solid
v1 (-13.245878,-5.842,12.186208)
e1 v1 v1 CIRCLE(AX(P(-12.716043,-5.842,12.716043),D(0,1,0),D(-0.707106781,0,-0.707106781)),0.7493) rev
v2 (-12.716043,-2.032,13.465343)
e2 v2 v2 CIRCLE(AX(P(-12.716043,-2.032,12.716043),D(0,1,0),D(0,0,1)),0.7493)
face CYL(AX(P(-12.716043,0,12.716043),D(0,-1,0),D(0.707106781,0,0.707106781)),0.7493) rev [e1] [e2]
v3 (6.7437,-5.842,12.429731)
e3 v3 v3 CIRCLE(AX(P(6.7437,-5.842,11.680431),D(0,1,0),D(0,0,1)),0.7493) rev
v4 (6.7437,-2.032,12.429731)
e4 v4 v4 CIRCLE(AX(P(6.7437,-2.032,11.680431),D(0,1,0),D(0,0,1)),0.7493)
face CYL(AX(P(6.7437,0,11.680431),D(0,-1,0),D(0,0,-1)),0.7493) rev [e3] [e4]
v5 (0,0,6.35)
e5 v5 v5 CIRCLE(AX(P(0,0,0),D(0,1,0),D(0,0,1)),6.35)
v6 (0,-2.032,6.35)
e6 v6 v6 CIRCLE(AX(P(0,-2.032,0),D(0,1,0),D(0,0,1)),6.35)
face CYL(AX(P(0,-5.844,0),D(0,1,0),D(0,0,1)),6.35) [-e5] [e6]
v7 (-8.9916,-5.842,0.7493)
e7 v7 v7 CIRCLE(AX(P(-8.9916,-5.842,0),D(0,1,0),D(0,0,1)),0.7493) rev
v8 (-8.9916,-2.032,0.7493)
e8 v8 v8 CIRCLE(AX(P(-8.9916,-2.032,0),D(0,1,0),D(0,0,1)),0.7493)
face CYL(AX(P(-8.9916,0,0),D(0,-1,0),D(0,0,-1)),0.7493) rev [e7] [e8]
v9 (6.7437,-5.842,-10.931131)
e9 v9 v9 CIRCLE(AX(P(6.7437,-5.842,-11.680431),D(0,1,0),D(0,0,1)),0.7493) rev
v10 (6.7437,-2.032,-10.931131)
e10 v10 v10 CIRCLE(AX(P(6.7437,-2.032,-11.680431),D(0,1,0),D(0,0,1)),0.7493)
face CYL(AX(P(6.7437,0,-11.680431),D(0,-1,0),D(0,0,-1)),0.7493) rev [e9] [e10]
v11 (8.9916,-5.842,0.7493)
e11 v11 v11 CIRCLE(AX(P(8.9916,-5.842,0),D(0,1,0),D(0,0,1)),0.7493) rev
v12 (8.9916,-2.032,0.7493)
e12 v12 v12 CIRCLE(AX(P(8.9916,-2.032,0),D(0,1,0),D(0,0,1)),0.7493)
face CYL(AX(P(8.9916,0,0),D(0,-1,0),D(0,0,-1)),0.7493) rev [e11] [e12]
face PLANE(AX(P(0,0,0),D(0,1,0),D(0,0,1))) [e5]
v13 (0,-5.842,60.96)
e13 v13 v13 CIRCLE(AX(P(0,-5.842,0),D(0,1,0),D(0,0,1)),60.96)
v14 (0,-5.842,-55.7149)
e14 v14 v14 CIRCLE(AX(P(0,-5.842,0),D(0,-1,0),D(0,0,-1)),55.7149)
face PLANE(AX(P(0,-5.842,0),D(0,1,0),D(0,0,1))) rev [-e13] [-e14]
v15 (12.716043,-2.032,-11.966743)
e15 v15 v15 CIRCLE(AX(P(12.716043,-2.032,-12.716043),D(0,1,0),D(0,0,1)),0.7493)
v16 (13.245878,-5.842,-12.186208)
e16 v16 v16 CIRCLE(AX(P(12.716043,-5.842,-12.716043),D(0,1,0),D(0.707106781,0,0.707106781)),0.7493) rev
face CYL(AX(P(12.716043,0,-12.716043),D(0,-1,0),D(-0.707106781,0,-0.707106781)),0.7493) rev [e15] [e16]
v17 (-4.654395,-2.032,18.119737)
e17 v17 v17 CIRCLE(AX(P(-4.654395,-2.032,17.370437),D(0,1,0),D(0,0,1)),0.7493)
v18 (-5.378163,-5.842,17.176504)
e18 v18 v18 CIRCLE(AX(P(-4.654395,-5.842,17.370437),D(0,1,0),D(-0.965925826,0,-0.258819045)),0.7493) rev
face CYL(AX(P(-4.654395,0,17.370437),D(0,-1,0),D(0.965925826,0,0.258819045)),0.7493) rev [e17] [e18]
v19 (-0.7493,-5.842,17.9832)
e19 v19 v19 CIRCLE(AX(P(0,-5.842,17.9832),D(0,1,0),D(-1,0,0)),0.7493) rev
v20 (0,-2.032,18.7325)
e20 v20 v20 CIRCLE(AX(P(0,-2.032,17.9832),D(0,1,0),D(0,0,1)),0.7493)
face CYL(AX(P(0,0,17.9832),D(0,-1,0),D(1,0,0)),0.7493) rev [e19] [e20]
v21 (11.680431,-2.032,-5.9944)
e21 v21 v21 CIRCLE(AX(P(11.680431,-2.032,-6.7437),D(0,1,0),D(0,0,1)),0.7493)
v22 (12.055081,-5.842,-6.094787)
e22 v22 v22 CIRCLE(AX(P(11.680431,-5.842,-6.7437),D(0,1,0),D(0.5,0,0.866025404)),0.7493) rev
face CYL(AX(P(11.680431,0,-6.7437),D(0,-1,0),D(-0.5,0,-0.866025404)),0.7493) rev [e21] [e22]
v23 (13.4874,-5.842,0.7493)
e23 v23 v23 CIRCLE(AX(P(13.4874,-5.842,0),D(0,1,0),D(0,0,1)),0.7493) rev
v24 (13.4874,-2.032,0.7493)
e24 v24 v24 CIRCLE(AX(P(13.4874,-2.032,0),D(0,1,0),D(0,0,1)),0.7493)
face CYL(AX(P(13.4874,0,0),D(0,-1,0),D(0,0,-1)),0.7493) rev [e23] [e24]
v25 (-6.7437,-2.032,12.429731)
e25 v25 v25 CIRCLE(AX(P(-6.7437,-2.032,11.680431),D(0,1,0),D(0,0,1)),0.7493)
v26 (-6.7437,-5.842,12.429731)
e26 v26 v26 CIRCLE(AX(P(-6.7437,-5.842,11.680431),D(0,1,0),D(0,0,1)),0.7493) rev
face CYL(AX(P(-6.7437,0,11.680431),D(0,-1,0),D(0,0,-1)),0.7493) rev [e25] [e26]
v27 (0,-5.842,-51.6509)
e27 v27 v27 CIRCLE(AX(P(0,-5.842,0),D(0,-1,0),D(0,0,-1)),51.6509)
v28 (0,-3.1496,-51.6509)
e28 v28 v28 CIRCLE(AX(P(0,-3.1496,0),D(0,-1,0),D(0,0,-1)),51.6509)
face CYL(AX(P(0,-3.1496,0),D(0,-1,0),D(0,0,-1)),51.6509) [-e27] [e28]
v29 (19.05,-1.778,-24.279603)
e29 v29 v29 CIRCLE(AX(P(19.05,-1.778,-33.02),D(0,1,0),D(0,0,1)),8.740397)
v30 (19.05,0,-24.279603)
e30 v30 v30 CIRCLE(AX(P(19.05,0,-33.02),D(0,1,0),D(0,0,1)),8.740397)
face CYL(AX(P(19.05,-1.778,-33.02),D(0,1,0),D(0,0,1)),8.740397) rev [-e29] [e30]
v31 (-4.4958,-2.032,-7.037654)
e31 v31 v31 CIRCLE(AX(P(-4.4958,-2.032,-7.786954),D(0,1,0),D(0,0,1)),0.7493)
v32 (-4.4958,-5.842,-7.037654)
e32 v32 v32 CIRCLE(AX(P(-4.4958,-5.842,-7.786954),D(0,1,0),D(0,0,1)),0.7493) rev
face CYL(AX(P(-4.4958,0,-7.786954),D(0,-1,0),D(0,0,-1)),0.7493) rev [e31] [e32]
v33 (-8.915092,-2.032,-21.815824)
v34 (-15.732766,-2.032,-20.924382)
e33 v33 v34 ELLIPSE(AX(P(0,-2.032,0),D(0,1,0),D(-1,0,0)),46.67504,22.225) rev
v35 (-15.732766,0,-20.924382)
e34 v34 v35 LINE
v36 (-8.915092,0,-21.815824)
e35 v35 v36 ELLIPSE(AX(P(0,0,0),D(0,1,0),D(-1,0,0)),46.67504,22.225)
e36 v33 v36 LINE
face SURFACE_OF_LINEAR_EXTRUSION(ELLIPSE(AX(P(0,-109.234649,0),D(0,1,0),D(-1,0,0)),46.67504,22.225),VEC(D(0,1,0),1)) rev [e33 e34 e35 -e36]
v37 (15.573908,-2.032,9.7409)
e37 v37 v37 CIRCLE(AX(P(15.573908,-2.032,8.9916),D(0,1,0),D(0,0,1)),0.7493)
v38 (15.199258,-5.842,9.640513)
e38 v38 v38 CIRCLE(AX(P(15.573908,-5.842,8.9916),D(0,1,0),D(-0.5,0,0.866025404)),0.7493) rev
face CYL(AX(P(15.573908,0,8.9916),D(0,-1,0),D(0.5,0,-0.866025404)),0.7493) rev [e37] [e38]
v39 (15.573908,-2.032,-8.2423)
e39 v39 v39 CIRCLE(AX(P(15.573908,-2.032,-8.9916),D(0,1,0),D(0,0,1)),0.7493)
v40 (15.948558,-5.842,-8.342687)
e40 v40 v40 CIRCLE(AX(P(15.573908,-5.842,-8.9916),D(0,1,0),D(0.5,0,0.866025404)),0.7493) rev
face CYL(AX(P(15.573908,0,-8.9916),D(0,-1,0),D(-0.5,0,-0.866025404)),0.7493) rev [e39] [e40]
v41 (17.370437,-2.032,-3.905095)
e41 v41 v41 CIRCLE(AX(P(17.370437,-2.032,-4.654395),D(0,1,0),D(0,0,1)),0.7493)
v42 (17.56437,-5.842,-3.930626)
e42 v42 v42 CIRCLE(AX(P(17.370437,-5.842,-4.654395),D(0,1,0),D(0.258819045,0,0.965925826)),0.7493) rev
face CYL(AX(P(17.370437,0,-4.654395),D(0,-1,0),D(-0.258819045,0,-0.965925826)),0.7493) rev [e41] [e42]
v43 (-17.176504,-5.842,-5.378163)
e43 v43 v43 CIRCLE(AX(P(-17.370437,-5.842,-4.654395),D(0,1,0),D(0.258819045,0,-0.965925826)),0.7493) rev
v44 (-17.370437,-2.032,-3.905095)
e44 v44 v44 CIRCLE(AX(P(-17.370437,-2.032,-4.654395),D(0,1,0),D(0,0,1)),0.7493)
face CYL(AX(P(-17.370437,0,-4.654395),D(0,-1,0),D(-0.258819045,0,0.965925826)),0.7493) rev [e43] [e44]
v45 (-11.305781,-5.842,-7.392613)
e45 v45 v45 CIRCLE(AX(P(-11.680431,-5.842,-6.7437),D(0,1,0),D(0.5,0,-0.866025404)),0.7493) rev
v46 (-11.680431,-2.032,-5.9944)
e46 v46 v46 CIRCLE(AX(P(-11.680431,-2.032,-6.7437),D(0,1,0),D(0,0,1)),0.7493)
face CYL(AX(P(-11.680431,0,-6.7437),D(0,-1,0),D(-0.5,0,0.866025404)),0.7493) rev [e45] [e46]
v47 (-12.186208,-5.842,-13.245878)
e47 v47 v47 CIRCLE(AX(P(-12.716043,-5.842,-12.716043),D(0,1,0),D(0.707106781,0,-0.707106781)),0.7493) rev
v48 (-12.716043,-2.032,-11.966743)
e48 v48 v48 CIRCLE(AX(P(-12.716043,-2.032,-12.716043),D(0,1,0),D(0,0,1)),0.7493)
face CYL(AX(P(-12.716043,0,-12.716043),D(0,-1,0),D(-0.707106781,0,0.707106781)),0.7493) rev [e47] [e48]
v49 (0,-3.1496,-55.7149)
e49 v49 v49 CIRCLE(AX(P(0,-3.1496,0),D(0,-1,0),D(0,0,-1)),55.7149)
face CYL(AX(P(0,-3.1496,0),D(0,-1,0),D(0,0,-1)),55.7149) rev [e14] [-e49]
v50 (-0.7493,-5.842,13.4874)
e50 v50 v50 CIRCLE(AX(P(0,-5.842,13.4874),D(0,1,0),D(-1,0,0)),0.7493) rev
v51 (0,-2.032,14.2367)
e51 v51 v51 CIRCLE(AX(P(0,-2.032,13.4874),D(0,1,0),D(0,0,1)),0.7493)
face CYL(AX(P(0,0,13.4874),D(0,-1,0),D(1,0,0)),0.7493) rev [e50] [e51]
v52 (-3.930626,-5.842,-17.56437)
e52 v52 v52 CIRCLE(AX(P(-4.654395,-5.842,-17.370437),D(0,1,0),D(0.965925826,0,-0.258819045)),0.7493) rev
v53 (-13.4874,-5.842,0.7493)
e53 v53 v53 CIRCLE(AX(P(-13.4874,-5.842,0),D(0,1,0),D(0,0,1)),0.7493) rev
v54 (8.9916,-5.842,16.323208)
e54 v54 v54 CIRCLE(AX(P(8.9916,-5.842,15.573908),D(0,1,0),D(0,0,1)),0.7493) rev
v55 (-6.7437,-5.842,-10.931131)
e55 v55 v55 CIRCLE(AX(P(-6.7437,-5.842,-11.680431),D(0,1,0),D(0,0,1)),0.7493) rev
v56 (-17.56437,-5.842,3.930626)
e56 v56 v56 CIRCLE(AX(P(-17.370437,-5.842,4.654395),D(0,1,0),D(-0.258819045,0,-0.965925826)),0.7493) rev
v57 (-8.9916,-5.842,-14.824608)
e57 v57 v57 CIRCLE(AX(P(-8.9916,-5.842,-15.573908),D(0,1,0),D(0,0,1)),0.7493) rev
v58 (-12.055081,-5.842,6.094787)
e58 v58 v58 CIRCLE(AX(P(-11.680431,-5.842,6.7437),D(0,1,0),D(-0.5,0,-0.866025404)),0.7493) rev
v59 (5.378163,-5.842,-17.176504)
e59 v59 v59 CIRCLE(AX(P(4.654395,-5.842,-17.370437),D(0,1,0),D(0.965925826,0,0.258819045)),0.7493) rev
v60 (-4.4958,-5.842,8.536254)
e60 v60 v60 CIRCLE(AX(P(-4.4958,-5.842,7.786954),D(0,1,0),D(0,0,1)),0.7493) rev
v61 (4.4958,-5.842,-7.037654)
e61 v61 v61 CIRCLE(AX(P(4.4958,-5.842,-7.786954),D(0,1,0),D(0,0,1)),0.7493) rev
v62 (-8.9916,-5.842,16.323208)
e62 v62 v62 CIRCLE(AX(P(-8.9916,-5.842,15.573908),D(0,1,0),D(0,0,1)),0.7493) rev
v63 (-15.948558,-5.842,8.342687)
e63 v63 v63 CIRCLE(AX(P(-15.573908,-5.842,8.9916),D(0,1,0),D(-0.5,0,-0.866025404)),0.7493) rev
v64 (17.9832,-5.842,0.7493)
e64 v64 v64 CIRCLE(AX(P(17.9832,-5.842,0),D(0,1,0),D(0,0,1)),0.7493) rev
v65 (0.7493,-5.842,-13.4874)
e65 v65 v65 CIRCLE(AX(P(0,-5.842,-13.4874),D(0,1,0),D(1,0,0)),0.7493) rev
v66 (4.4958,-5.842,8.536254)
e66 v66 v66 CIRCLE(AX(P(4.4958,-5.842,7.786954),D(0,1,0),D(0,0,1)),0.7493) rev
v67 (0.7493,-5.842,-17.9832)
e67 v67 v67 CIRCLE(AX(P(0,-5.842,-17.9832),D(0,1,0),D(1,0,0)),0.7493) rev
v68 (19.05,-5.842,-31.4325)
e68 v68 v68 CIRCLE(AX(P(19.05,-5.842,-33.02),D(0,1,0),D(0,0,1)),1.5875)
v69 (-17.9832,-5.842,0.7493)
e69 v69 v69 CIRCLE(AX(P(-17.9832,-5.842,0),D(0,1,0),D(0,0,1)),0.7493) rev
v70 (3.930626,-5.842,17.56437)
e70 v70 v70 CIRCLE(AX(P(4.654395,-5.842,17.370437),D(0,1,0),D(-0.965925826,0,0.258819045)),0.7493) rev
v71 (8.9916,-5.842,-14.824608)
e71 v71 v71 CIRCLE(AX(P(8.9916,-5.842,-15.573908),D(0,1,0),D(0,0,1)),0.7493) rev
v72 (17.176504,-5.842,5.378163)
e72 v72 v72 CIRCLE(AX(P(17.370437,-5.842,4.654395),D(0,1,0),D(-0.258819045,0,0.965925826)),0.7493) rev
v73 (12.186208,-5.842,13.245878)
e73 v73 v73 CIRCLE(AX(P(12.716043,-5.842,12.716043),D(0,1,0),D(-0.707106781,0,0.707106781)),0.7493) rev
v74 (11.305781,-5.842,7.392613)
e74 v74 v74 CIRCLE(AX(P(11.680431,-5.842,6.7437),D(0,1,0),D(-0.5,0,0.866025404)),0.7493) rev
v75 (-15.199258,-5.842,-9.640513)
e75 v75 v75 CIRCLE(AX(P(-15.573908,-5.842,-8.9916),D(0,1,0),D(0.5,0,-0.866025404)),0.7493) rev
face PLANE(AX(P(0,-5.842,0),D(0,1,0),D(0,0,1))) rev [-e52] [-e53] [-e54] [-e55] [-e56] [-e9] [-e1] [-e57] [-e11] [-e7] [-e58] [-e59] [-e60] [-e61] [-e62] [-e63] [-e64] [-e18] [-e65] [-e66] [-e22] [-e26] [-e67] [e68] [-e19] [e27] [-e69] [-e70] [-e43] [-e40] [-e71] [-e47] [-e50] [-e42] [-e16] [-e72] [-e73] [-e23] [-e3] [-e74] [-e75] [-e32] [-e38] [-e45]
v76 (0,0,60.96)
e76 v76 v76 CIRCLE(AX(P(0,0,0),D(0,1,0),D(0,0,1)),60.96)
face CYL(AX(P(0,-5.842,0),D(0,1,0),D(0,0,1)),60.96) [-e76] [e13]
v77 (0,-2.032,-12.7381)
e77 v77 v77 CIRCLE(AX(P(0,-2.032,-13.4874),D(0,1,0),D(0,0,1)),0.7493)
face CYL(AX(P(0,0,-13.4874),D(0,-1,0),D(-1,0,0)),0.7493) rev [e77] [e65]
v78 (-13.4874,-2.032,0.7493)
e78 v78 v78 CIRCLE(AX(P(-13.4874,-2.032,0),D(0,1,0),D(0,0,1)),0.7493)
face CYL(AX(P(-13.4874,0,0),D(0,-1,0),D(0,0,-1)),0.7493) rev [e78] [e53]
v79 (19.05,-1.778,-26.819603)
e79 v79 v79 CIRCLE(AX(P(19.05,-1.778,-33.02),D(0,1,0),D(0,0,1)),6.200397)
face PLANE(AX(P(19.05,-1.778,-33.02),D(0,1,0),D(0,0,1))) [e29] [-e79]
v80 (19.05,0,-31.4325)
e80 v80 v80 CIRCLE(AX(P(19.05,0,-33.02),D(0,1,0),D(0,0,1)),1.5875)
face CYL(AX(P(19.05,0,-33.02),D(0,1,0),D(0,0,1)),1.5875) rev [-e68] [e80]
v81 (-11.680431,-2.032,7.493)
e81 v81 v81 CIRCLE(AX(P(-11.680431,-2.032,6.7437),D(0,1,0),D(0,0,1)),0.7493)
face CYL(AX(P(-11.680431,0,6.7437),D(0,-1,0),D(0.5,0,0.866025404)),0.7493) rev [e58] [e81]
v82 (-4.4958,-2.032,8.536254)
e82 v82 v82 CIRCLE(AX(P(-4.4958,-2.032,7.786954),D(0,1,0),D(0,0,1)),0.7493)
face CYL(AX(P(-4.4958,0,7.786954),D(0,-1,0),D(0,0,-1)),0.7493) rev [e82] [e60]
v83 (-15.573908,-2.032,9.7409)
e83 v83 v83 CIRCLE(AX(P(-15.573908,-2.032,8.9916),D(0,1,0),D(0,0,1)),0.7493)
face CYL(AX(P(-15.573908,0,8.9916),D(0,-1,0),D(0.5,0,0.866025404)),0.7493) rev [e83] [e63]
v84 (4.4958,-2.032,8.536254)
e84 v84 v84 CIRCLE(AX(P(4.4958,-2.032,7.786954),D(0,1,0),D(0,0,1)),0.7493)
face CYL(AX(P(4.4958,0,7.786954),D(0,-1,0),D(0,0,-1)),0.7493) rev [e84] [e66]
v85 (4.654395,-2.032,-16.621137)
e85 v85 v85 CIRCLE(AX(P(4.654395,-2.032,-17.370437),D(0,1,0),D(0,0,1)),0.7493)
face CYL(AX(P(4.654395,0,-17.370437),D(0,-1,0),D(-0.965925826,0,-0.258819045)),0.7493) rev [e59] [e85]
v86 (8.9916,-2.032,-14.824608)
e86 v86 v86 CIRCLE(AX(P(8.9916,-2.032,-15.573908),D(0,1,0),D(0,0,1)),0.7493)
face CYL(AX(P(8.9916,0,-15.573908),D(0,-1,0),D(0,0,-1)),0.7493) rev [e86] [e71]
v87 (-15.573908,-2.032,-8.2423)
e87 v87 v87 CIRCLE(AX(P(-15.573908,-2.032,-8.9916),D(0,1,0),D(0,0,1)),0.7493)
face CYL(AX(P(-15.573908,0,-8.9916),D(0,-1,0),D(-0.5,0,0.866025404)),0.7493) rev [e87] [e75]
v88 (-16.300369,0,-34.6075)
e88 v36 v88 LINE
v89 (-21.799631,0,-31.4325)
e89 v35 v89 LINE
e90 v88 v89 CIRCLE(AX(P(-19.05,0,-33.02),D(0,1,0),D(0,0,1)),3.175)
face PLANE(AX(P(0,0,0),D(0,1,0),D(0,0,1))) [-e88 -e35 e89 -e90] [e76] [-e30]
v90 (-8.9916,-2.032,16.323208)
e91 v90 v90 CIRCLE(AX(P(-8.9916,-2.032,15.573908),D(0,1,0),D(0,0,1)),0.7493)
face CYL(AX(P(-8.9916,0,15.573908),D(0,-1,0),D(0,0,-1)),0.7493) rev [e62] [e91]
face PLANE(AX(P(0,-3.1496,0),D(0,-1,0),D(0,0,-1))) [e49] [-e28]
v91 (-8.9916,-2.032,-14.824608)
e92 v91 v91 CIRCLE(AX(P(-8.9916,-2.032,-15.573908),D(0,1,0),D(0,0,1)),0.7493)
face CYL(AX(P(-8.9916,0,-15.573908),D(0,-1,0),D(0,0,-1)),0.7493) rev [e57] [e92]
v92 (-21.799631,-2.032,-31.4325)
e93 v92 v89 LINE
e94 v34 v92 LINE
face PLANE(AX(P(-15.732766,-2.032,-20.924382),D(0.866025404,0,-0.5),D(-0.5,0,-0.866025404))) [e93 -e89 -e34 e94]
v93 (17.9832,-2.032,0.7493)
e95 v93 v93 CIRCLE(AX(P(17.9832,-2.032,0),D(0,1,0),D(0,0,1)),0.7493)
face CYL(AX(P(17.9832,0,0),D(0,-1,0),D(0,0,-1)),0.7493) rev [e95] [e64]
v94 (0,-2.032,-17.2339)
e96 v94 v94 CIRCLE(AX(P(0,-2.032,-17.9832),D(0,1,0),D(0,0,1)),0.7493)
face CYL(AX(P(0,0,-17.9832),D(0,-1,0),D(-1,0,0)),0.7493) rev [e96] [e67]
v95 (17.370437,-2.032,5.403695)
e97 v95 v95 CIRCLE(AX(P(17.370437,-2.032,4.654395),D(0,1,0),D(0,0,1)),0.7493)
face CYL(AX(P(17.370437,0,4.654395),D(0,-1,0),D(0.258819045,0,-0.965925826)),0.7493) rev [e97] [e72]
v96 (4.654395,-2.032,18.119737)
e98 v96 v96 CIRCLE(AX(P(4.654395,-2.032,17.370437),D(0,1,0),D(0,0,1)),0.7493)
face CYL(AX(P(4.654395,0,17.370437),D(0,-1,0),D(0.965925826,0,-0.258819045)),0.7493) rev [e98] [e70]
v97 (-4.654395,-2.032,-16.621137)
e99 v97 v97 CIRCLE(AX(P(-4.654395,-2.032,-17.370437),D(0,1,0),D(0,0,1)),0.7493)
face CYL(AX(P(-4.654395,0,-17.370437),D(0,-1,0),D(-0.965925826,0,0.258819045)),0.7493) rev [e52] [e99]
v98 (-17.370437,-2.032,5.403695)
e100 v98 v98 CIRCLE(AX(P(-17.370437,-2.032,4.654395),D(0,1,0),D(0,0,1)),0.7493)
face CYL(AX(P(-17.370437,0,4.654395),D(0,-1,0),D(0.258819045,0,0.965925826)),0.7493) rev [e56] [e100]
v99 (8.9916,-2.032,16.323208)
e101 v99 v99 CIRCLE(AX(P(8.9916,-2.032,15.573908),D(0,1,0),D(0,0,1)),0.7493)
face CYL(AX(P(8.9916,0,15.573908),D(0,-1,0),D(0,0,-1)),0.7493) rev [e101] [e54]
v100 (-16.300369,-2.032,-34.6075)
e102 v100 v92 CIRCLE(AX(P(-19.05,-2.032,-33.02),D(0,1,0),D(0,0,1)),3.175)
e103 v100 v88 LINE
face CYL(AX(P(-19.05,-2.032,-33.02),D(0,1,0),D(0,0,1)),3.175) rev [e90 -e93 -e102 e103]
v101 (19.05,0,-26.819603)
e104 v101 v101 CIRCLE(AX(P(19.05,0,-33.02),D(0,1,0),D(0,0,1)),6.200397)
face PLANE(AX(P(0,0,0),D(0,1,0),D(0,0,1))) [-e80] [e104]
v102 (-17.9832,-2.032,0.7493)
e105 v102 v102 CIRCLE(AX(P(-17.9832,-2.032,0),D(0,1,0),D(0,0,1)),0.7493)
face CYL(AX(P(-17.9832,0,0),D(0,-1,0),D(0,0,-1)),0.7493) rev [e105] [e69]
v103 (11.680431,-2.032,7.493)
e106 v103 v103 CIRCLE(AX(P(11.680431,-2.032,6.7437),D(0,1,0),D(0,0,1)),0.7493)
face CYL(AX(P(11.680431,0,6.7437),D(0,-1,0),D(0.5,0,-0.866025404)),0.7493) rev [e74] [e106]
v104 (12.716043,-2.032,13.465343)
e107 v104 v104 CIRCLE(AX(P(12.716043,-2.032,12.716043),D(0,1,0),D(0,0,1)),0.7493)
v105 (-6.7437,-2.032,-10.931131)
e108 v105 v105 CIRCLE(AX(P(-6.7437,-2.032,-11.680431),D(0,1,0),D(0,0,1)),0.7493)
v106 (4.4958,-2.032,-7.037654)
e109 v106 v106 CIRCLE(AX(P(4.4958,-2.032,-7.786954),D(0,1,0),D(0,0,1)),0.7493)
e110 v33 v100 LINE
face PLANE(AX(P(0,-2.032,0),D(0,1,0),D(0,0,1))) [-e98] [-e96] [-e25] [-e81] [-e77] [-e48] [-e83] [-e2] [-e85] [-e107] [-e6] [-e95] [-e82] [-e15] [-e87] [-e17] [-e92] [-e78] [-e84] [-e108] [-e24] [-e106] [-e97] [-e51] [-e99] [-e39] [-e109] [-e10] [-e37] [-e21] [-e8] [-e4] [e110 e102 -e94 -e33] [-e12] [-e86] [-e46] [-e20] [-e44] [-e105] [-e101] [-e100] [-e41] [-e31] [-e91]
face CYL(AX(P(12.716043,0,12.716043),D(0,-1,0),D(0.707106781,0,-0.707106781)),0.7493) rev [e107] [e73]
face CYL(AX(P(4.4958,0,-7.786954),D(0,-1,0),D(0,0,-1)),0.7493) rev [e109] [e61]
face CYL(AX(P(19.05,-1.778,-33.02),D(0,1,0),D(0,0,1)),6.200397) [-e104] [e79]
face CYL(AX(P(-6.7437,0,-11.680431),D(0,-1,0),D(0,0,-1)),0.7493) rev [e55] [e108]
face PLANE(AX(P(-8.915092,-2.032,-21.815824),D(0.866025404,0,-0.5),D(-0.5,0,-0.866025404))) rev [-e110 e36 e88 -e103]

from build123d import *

# Parameters (mm, degrees)
SKETCH1_R                       = 60.96
BILLET_DEPTH                    = 5.842
SKETCH4_R                       = 0.7493
FIRST_KEROSENE_OUTLET_DEPTH     = 88.140881336
PRIMARY_HOLES_COUNT             = 6
SECOND_START                    = -5.842
SECOND_RING_OUTLINE_R           = 0.7493
SECOND_RING_DEPTH               = 5.842
THIRD_START                     = -5.842
THIRD_RING_OUTLINE_R            = 0.7493
THIRD_RING_DEPTH                = 5.842
SKETCH18_RX                     = 46.67504
SKETCH18_RY                     = 22.225
KEROSENE_WELL_DEPTH             = 2.032
SKETCH17_R                      = 6.35
BOSS_EXTRUDE1_DEPTH             = 2.54
BOSS_EXTRUDE1_DIRECTION_2_REACH = 88.408
SKETCH21_R                      = 6.35
CUT_EXTRUDE1_DEPTH              = 2.54
CUT_EXTRUDE2_DEPTH              = 2.032
F_1_8_0_125_DIAMETER_HOLE2_D    = 3.175
SKETCH31_R                      = 8.740396603
SKETCH31_R_2                    = 6.200396603
CUT_EXTRUDE4_DEPTH              = 1.778
SKETCH32_R                      = 55.7149
SKETCH32_R_2                    = 51.6509
CUT_EXTRUDE5_DEPTH              = 2.6924


# Read off the part's stored shape, not the designer's step: Second ring, Third Ring
with BuildPart() as part:
    # Sketch1 → Billet (new body)
    with BuildSketch(Plane(origin=(0, 0, 0), x_dir=(1, 0, 0), z_dir=(0, 1, 0))):
        with Locations(Location((0, 0, 0), (0, 0, 270))):
            Circle(SKETCH1_R)
    extrude(amount=-BILLET_DEPTH)

    # Sketch4 → First Kerosene Outlet (cut, symmetric)
    with BuildSketch(Plane(origin=(0, -12.7, 0), x_dir=(1, 0, 0), z_dir=(0, 1, 0))):
        with Locations(Location((8.9916, 0, 0), (0, 0, 270))):
            Circle(SKETCH4_R)
        with Locations(Location((13.4874, 0, 0), (0, 0, 270))):
            Circle(SKETCH4_R)
        with Locations(Location((17.9832, 0, 0), (0, 0, 270))):
            Circle(SKETCH4_R)
    first_kerosene_outlet = extrude(amount=FIRST_KEROSENE_OUTLET_DEPTH, both=True, mode=Mode.SUBTRACT)

    # Primary Holes: First Kerosene Outlet ×6 about axis
    primary_holes_axis = Axis((0, 0, 0), (0, 1, 0))
    for i in range(1, PRIMARY_HOLES_COUNT):
        add(first_kerosene_outlet.rotate(primary_holes_axis, i * 360 / PRIMARY_HOLES_COUNT), mode=Mode.SUBTRACT)

    # Second ring outline → Second ring (cut)
    with BuildSketch(Plane(origin=(0, 0, 0), x_dir=(1, 0, 0), z_dir=(0, 1, 0)).offset(SECOND_START)):
        with Locations((11.680431031, 6.7437)):
            Circle(SECOND_RING_OUTLINE_R)
        with Locations((0, 13.4874)):
            Circle(SECOND_RING_OUTLINE_R)
        with Locations((-11.680431031, 6.7437)):
            Circle(SECOND_RING_OUTLINE_R)
        with Locations((-11.680431031, -6.7437)):
            Circle(SECOND_RING_OUTLINE_R)
        with Locations((0, -13.4874)):
            Circle(SECOND_RING_OUTLINE_R)
        with Locations((11.680431031, -6.7437)):
            Circle(SECOND_RING_OUTLINE_R)
    extrude(amount=SECOND_RING_DEPTH, mode=Mode.SUBTRACT)

    # Third Ring outline → Third Ring (cut)
    with BuildSketch(Plane(origin=(0, 0, 0), x_dir=(1, 0, 0), z_dir=(0, 1, 0)).offset(THIRD_START)):
        with Locations((17.370437319, 4.654394652)):
            Circle(THIRD_RING_OUTLINE_R)
        with Locations((15.573908041, 8.9916)):
            Circle(THIRD_RING_OUTLINE_R)
        with Locations((12.716042667, 12.716042667)):
            Circle(THIRD_RING_OUTLINE_R)
        with Locations((4.654394652, 17.370437319)):
            Circle(THIRD_RING_OUTLINE_R)
        with Locations((0, 17.9832)):
            Circle(THIRD_RING_OUTLINE_R)
        with Locations((-4.654394652, 17.370437319)):
            Circle(THIRD_RING_OUTLINE_R)
        with Locations((-12.716042667, 12.716042667)):
            Circle(THIRD_RING_OUTLINE_R)
        with Locations((-15.573908041, 8.9916)):
            Circle(THIRD_RING_OUTLINE_R)
        with Locations((-17.370437319, 4.654394652)):
            Circle(THIRD_RING_OUTLINE_R)
        with Locations((-17.370437319, -4.654394652)):
            Circle(THIRD_RING_OUTLINE_R)
        with Locations((-15.573908041, -8.9916)):
            Circle(THIRD_RING_OUTLINE_R)
        with Locations((-12.716042667, -12.716042667)):
            Circle(THIRD_RING_OUTLINE_R)
        with Locations((-4.654394652, -17.370437319)):
            Circle(THIRD_RING_OUTLINE_R)
        with Locations((0, -17.9832)):
            Circle(THIRD_RING_OUTLINE_R)
        with Locations((4.654394652, -17.370437319)):
            Circle(THIRD_RING_OUTLINE_R)
        with Locations((12.716042667, -12.716042667)):
            Circle(THIRD_RING_OUTLINE_R)
        with Locations((15.573908041, -8.9916)):
            Circle(THIRD_RING_OUTLINE_R)
        with Locations((17.370437319, -4.654394652)):
            Circle(THIRD_RING_OUTLINE_R)
    extrude(amount=THIRD_RING_DEPTH, mode=Mode.SUBTRACT)

    # Sketch18 → Kerosene Well (cut)
    with BuildSketch(Plane(origin=(0, 0, 0), x_dir=(1, 0, 0), z_dir=(0, 1, 0))):
        with Locations(Location((0, 0), (0, 0, -180))):
            Ellipse(SKETCH18_RX, SKETCH18_RY)
    extrude(amount=-KEROSENE_WELL_DEPTH, mode=Mode.SUBTRACT)

    # Sketch17 → Boss-Extrude1 (add)
    with BuildSketch(Plane(origin=(0, 0, 0), x_dir=(1, 0, 0), z_dir=(0, 1, 0))):
        with Locations(Location((0, 0, 0), (0, 0, 270))):
            Circle(SKETCH17_R)
    extrude(amount=BOSS_EXTRUDE1_DEPTH)

    # Sketch17 → Boss-Extrude1 direction 2 (add, up to next)
    with BuildSketch(Plane(origin=(0, 0, 0), x_dir=(1, 0, 0), z_dir=(0, 1, 0)), mode=Mode.PRIVATE) as boss_extrude1_direction_2_sk1:
        with Locations(Location((0, 0, 0), (0, 0, 270))):
            Circle(SKETCH17_R)
    boss_extrude1_direction_2_tool1 = extrude(boss_extrude1_direction_2_sk1.sketch, amount=-BOSS_EXTRUDE1_DIRECTION_2_REACH, mode=Mode.PRIVATE) - part.part
    add(boss_extrude1_direction_2_tool1.solids().sort_by_distance((0, 0, 0))[0])

    # Sketch21 → Cut-Extrude1 (cut)
    with BuildSketch(Plane(origin=(0, 2.54, 0), x_dir=(1, 0, 0), z_dir=(0, 1, 0))):
        with Locations(Location((0, 0, 0), (0, 0, 270))):
            Circle(SKETCH21_R)
    extrude(amount=-CUT_EXTRUDE1_DEPTH, mode=Mode.SUBTRACT)

    # Sketch24 → Cut-Extrude2 (cut)
    with BuildSketch(Plane(origin=(0, 0, 0), x_dir=(1, 0, 0), z_dir=(0, 1, 0))):
        with BuildLine():
            Line((-15.732765962, 20.924382105), (-21.799630657, 31.4325))
            ThreePointArc((-21.799630657, 31.4325), (-20.6375, 35.769630657), (-16.300369343, 34.6075))
            Line((-16.300369343, 34.6075), (-8.915091663, 21.81582383))
            add(Edge.make_bspline(
                [(-8.915091663, 21.81582383), (-12.395027666, 21.493390748), (-15.732765962, 20.924382105)],
                knots=[4.904573252, 4.904573252, 4.904573252, 5.056192247, 5.056192247, 5.056192247], degree=2, weights=[1, 0.997127836, 1]))
        make_face()
    extrude(amount=-CUT_EXTRUDE2_DEPTH, mode=Mode.SUBTRACT)

    # 1/8 (0.125) Diameter Hole2 (through all)
    with Locations(Plane(origin=(19.05, 0, -33.02), x_dir=(0, 0, 1), z_dir=(0, 1, 0))):
        with Locations((0, 0)):
            Hole(F_1_8_0_125_DIAMETER_HOLE2_D / 2)

    # Sketch31 → Cut-Extrude4 (cut)
    with BuildSketch(Plane(origin=(0, 0, 0), x_dir=(1, 0, 0), z_dir=(0, 1, 0))):
        with Locations(Location((19.05, 33.02, 0), (0, 0, 270))):
            Circle(SKETCH31_R)
        with Locations(Location((19.05, 33.02, 0), (0, 0, 270))):
            Circle(SKETCH31_R_2, mode=Mode.SUBTRACT)
    extrude(amount=-CUT_EXTRUDE4_DEPTH, mode=Mode.SUBTRACT)

    # Sketch32 → Cut-Extrude5 (cut)
    with BuildSketch(Plane.XZ.offset(5.842)):
        with Locations(Location((0, 0, 0), (0, 0, 270))):
            Circle(SKETCH32_R)
        with Locations(Location((0, 0, 0), (0, 0, 270))):
            Circle(SKETCH32_R_2, mode=Mode.SUBTRACT)
    extrude(amount=-CUT_EXTRUDE5_DEPTH, mode=Mode.SUBTRACT)


solid = part.part
